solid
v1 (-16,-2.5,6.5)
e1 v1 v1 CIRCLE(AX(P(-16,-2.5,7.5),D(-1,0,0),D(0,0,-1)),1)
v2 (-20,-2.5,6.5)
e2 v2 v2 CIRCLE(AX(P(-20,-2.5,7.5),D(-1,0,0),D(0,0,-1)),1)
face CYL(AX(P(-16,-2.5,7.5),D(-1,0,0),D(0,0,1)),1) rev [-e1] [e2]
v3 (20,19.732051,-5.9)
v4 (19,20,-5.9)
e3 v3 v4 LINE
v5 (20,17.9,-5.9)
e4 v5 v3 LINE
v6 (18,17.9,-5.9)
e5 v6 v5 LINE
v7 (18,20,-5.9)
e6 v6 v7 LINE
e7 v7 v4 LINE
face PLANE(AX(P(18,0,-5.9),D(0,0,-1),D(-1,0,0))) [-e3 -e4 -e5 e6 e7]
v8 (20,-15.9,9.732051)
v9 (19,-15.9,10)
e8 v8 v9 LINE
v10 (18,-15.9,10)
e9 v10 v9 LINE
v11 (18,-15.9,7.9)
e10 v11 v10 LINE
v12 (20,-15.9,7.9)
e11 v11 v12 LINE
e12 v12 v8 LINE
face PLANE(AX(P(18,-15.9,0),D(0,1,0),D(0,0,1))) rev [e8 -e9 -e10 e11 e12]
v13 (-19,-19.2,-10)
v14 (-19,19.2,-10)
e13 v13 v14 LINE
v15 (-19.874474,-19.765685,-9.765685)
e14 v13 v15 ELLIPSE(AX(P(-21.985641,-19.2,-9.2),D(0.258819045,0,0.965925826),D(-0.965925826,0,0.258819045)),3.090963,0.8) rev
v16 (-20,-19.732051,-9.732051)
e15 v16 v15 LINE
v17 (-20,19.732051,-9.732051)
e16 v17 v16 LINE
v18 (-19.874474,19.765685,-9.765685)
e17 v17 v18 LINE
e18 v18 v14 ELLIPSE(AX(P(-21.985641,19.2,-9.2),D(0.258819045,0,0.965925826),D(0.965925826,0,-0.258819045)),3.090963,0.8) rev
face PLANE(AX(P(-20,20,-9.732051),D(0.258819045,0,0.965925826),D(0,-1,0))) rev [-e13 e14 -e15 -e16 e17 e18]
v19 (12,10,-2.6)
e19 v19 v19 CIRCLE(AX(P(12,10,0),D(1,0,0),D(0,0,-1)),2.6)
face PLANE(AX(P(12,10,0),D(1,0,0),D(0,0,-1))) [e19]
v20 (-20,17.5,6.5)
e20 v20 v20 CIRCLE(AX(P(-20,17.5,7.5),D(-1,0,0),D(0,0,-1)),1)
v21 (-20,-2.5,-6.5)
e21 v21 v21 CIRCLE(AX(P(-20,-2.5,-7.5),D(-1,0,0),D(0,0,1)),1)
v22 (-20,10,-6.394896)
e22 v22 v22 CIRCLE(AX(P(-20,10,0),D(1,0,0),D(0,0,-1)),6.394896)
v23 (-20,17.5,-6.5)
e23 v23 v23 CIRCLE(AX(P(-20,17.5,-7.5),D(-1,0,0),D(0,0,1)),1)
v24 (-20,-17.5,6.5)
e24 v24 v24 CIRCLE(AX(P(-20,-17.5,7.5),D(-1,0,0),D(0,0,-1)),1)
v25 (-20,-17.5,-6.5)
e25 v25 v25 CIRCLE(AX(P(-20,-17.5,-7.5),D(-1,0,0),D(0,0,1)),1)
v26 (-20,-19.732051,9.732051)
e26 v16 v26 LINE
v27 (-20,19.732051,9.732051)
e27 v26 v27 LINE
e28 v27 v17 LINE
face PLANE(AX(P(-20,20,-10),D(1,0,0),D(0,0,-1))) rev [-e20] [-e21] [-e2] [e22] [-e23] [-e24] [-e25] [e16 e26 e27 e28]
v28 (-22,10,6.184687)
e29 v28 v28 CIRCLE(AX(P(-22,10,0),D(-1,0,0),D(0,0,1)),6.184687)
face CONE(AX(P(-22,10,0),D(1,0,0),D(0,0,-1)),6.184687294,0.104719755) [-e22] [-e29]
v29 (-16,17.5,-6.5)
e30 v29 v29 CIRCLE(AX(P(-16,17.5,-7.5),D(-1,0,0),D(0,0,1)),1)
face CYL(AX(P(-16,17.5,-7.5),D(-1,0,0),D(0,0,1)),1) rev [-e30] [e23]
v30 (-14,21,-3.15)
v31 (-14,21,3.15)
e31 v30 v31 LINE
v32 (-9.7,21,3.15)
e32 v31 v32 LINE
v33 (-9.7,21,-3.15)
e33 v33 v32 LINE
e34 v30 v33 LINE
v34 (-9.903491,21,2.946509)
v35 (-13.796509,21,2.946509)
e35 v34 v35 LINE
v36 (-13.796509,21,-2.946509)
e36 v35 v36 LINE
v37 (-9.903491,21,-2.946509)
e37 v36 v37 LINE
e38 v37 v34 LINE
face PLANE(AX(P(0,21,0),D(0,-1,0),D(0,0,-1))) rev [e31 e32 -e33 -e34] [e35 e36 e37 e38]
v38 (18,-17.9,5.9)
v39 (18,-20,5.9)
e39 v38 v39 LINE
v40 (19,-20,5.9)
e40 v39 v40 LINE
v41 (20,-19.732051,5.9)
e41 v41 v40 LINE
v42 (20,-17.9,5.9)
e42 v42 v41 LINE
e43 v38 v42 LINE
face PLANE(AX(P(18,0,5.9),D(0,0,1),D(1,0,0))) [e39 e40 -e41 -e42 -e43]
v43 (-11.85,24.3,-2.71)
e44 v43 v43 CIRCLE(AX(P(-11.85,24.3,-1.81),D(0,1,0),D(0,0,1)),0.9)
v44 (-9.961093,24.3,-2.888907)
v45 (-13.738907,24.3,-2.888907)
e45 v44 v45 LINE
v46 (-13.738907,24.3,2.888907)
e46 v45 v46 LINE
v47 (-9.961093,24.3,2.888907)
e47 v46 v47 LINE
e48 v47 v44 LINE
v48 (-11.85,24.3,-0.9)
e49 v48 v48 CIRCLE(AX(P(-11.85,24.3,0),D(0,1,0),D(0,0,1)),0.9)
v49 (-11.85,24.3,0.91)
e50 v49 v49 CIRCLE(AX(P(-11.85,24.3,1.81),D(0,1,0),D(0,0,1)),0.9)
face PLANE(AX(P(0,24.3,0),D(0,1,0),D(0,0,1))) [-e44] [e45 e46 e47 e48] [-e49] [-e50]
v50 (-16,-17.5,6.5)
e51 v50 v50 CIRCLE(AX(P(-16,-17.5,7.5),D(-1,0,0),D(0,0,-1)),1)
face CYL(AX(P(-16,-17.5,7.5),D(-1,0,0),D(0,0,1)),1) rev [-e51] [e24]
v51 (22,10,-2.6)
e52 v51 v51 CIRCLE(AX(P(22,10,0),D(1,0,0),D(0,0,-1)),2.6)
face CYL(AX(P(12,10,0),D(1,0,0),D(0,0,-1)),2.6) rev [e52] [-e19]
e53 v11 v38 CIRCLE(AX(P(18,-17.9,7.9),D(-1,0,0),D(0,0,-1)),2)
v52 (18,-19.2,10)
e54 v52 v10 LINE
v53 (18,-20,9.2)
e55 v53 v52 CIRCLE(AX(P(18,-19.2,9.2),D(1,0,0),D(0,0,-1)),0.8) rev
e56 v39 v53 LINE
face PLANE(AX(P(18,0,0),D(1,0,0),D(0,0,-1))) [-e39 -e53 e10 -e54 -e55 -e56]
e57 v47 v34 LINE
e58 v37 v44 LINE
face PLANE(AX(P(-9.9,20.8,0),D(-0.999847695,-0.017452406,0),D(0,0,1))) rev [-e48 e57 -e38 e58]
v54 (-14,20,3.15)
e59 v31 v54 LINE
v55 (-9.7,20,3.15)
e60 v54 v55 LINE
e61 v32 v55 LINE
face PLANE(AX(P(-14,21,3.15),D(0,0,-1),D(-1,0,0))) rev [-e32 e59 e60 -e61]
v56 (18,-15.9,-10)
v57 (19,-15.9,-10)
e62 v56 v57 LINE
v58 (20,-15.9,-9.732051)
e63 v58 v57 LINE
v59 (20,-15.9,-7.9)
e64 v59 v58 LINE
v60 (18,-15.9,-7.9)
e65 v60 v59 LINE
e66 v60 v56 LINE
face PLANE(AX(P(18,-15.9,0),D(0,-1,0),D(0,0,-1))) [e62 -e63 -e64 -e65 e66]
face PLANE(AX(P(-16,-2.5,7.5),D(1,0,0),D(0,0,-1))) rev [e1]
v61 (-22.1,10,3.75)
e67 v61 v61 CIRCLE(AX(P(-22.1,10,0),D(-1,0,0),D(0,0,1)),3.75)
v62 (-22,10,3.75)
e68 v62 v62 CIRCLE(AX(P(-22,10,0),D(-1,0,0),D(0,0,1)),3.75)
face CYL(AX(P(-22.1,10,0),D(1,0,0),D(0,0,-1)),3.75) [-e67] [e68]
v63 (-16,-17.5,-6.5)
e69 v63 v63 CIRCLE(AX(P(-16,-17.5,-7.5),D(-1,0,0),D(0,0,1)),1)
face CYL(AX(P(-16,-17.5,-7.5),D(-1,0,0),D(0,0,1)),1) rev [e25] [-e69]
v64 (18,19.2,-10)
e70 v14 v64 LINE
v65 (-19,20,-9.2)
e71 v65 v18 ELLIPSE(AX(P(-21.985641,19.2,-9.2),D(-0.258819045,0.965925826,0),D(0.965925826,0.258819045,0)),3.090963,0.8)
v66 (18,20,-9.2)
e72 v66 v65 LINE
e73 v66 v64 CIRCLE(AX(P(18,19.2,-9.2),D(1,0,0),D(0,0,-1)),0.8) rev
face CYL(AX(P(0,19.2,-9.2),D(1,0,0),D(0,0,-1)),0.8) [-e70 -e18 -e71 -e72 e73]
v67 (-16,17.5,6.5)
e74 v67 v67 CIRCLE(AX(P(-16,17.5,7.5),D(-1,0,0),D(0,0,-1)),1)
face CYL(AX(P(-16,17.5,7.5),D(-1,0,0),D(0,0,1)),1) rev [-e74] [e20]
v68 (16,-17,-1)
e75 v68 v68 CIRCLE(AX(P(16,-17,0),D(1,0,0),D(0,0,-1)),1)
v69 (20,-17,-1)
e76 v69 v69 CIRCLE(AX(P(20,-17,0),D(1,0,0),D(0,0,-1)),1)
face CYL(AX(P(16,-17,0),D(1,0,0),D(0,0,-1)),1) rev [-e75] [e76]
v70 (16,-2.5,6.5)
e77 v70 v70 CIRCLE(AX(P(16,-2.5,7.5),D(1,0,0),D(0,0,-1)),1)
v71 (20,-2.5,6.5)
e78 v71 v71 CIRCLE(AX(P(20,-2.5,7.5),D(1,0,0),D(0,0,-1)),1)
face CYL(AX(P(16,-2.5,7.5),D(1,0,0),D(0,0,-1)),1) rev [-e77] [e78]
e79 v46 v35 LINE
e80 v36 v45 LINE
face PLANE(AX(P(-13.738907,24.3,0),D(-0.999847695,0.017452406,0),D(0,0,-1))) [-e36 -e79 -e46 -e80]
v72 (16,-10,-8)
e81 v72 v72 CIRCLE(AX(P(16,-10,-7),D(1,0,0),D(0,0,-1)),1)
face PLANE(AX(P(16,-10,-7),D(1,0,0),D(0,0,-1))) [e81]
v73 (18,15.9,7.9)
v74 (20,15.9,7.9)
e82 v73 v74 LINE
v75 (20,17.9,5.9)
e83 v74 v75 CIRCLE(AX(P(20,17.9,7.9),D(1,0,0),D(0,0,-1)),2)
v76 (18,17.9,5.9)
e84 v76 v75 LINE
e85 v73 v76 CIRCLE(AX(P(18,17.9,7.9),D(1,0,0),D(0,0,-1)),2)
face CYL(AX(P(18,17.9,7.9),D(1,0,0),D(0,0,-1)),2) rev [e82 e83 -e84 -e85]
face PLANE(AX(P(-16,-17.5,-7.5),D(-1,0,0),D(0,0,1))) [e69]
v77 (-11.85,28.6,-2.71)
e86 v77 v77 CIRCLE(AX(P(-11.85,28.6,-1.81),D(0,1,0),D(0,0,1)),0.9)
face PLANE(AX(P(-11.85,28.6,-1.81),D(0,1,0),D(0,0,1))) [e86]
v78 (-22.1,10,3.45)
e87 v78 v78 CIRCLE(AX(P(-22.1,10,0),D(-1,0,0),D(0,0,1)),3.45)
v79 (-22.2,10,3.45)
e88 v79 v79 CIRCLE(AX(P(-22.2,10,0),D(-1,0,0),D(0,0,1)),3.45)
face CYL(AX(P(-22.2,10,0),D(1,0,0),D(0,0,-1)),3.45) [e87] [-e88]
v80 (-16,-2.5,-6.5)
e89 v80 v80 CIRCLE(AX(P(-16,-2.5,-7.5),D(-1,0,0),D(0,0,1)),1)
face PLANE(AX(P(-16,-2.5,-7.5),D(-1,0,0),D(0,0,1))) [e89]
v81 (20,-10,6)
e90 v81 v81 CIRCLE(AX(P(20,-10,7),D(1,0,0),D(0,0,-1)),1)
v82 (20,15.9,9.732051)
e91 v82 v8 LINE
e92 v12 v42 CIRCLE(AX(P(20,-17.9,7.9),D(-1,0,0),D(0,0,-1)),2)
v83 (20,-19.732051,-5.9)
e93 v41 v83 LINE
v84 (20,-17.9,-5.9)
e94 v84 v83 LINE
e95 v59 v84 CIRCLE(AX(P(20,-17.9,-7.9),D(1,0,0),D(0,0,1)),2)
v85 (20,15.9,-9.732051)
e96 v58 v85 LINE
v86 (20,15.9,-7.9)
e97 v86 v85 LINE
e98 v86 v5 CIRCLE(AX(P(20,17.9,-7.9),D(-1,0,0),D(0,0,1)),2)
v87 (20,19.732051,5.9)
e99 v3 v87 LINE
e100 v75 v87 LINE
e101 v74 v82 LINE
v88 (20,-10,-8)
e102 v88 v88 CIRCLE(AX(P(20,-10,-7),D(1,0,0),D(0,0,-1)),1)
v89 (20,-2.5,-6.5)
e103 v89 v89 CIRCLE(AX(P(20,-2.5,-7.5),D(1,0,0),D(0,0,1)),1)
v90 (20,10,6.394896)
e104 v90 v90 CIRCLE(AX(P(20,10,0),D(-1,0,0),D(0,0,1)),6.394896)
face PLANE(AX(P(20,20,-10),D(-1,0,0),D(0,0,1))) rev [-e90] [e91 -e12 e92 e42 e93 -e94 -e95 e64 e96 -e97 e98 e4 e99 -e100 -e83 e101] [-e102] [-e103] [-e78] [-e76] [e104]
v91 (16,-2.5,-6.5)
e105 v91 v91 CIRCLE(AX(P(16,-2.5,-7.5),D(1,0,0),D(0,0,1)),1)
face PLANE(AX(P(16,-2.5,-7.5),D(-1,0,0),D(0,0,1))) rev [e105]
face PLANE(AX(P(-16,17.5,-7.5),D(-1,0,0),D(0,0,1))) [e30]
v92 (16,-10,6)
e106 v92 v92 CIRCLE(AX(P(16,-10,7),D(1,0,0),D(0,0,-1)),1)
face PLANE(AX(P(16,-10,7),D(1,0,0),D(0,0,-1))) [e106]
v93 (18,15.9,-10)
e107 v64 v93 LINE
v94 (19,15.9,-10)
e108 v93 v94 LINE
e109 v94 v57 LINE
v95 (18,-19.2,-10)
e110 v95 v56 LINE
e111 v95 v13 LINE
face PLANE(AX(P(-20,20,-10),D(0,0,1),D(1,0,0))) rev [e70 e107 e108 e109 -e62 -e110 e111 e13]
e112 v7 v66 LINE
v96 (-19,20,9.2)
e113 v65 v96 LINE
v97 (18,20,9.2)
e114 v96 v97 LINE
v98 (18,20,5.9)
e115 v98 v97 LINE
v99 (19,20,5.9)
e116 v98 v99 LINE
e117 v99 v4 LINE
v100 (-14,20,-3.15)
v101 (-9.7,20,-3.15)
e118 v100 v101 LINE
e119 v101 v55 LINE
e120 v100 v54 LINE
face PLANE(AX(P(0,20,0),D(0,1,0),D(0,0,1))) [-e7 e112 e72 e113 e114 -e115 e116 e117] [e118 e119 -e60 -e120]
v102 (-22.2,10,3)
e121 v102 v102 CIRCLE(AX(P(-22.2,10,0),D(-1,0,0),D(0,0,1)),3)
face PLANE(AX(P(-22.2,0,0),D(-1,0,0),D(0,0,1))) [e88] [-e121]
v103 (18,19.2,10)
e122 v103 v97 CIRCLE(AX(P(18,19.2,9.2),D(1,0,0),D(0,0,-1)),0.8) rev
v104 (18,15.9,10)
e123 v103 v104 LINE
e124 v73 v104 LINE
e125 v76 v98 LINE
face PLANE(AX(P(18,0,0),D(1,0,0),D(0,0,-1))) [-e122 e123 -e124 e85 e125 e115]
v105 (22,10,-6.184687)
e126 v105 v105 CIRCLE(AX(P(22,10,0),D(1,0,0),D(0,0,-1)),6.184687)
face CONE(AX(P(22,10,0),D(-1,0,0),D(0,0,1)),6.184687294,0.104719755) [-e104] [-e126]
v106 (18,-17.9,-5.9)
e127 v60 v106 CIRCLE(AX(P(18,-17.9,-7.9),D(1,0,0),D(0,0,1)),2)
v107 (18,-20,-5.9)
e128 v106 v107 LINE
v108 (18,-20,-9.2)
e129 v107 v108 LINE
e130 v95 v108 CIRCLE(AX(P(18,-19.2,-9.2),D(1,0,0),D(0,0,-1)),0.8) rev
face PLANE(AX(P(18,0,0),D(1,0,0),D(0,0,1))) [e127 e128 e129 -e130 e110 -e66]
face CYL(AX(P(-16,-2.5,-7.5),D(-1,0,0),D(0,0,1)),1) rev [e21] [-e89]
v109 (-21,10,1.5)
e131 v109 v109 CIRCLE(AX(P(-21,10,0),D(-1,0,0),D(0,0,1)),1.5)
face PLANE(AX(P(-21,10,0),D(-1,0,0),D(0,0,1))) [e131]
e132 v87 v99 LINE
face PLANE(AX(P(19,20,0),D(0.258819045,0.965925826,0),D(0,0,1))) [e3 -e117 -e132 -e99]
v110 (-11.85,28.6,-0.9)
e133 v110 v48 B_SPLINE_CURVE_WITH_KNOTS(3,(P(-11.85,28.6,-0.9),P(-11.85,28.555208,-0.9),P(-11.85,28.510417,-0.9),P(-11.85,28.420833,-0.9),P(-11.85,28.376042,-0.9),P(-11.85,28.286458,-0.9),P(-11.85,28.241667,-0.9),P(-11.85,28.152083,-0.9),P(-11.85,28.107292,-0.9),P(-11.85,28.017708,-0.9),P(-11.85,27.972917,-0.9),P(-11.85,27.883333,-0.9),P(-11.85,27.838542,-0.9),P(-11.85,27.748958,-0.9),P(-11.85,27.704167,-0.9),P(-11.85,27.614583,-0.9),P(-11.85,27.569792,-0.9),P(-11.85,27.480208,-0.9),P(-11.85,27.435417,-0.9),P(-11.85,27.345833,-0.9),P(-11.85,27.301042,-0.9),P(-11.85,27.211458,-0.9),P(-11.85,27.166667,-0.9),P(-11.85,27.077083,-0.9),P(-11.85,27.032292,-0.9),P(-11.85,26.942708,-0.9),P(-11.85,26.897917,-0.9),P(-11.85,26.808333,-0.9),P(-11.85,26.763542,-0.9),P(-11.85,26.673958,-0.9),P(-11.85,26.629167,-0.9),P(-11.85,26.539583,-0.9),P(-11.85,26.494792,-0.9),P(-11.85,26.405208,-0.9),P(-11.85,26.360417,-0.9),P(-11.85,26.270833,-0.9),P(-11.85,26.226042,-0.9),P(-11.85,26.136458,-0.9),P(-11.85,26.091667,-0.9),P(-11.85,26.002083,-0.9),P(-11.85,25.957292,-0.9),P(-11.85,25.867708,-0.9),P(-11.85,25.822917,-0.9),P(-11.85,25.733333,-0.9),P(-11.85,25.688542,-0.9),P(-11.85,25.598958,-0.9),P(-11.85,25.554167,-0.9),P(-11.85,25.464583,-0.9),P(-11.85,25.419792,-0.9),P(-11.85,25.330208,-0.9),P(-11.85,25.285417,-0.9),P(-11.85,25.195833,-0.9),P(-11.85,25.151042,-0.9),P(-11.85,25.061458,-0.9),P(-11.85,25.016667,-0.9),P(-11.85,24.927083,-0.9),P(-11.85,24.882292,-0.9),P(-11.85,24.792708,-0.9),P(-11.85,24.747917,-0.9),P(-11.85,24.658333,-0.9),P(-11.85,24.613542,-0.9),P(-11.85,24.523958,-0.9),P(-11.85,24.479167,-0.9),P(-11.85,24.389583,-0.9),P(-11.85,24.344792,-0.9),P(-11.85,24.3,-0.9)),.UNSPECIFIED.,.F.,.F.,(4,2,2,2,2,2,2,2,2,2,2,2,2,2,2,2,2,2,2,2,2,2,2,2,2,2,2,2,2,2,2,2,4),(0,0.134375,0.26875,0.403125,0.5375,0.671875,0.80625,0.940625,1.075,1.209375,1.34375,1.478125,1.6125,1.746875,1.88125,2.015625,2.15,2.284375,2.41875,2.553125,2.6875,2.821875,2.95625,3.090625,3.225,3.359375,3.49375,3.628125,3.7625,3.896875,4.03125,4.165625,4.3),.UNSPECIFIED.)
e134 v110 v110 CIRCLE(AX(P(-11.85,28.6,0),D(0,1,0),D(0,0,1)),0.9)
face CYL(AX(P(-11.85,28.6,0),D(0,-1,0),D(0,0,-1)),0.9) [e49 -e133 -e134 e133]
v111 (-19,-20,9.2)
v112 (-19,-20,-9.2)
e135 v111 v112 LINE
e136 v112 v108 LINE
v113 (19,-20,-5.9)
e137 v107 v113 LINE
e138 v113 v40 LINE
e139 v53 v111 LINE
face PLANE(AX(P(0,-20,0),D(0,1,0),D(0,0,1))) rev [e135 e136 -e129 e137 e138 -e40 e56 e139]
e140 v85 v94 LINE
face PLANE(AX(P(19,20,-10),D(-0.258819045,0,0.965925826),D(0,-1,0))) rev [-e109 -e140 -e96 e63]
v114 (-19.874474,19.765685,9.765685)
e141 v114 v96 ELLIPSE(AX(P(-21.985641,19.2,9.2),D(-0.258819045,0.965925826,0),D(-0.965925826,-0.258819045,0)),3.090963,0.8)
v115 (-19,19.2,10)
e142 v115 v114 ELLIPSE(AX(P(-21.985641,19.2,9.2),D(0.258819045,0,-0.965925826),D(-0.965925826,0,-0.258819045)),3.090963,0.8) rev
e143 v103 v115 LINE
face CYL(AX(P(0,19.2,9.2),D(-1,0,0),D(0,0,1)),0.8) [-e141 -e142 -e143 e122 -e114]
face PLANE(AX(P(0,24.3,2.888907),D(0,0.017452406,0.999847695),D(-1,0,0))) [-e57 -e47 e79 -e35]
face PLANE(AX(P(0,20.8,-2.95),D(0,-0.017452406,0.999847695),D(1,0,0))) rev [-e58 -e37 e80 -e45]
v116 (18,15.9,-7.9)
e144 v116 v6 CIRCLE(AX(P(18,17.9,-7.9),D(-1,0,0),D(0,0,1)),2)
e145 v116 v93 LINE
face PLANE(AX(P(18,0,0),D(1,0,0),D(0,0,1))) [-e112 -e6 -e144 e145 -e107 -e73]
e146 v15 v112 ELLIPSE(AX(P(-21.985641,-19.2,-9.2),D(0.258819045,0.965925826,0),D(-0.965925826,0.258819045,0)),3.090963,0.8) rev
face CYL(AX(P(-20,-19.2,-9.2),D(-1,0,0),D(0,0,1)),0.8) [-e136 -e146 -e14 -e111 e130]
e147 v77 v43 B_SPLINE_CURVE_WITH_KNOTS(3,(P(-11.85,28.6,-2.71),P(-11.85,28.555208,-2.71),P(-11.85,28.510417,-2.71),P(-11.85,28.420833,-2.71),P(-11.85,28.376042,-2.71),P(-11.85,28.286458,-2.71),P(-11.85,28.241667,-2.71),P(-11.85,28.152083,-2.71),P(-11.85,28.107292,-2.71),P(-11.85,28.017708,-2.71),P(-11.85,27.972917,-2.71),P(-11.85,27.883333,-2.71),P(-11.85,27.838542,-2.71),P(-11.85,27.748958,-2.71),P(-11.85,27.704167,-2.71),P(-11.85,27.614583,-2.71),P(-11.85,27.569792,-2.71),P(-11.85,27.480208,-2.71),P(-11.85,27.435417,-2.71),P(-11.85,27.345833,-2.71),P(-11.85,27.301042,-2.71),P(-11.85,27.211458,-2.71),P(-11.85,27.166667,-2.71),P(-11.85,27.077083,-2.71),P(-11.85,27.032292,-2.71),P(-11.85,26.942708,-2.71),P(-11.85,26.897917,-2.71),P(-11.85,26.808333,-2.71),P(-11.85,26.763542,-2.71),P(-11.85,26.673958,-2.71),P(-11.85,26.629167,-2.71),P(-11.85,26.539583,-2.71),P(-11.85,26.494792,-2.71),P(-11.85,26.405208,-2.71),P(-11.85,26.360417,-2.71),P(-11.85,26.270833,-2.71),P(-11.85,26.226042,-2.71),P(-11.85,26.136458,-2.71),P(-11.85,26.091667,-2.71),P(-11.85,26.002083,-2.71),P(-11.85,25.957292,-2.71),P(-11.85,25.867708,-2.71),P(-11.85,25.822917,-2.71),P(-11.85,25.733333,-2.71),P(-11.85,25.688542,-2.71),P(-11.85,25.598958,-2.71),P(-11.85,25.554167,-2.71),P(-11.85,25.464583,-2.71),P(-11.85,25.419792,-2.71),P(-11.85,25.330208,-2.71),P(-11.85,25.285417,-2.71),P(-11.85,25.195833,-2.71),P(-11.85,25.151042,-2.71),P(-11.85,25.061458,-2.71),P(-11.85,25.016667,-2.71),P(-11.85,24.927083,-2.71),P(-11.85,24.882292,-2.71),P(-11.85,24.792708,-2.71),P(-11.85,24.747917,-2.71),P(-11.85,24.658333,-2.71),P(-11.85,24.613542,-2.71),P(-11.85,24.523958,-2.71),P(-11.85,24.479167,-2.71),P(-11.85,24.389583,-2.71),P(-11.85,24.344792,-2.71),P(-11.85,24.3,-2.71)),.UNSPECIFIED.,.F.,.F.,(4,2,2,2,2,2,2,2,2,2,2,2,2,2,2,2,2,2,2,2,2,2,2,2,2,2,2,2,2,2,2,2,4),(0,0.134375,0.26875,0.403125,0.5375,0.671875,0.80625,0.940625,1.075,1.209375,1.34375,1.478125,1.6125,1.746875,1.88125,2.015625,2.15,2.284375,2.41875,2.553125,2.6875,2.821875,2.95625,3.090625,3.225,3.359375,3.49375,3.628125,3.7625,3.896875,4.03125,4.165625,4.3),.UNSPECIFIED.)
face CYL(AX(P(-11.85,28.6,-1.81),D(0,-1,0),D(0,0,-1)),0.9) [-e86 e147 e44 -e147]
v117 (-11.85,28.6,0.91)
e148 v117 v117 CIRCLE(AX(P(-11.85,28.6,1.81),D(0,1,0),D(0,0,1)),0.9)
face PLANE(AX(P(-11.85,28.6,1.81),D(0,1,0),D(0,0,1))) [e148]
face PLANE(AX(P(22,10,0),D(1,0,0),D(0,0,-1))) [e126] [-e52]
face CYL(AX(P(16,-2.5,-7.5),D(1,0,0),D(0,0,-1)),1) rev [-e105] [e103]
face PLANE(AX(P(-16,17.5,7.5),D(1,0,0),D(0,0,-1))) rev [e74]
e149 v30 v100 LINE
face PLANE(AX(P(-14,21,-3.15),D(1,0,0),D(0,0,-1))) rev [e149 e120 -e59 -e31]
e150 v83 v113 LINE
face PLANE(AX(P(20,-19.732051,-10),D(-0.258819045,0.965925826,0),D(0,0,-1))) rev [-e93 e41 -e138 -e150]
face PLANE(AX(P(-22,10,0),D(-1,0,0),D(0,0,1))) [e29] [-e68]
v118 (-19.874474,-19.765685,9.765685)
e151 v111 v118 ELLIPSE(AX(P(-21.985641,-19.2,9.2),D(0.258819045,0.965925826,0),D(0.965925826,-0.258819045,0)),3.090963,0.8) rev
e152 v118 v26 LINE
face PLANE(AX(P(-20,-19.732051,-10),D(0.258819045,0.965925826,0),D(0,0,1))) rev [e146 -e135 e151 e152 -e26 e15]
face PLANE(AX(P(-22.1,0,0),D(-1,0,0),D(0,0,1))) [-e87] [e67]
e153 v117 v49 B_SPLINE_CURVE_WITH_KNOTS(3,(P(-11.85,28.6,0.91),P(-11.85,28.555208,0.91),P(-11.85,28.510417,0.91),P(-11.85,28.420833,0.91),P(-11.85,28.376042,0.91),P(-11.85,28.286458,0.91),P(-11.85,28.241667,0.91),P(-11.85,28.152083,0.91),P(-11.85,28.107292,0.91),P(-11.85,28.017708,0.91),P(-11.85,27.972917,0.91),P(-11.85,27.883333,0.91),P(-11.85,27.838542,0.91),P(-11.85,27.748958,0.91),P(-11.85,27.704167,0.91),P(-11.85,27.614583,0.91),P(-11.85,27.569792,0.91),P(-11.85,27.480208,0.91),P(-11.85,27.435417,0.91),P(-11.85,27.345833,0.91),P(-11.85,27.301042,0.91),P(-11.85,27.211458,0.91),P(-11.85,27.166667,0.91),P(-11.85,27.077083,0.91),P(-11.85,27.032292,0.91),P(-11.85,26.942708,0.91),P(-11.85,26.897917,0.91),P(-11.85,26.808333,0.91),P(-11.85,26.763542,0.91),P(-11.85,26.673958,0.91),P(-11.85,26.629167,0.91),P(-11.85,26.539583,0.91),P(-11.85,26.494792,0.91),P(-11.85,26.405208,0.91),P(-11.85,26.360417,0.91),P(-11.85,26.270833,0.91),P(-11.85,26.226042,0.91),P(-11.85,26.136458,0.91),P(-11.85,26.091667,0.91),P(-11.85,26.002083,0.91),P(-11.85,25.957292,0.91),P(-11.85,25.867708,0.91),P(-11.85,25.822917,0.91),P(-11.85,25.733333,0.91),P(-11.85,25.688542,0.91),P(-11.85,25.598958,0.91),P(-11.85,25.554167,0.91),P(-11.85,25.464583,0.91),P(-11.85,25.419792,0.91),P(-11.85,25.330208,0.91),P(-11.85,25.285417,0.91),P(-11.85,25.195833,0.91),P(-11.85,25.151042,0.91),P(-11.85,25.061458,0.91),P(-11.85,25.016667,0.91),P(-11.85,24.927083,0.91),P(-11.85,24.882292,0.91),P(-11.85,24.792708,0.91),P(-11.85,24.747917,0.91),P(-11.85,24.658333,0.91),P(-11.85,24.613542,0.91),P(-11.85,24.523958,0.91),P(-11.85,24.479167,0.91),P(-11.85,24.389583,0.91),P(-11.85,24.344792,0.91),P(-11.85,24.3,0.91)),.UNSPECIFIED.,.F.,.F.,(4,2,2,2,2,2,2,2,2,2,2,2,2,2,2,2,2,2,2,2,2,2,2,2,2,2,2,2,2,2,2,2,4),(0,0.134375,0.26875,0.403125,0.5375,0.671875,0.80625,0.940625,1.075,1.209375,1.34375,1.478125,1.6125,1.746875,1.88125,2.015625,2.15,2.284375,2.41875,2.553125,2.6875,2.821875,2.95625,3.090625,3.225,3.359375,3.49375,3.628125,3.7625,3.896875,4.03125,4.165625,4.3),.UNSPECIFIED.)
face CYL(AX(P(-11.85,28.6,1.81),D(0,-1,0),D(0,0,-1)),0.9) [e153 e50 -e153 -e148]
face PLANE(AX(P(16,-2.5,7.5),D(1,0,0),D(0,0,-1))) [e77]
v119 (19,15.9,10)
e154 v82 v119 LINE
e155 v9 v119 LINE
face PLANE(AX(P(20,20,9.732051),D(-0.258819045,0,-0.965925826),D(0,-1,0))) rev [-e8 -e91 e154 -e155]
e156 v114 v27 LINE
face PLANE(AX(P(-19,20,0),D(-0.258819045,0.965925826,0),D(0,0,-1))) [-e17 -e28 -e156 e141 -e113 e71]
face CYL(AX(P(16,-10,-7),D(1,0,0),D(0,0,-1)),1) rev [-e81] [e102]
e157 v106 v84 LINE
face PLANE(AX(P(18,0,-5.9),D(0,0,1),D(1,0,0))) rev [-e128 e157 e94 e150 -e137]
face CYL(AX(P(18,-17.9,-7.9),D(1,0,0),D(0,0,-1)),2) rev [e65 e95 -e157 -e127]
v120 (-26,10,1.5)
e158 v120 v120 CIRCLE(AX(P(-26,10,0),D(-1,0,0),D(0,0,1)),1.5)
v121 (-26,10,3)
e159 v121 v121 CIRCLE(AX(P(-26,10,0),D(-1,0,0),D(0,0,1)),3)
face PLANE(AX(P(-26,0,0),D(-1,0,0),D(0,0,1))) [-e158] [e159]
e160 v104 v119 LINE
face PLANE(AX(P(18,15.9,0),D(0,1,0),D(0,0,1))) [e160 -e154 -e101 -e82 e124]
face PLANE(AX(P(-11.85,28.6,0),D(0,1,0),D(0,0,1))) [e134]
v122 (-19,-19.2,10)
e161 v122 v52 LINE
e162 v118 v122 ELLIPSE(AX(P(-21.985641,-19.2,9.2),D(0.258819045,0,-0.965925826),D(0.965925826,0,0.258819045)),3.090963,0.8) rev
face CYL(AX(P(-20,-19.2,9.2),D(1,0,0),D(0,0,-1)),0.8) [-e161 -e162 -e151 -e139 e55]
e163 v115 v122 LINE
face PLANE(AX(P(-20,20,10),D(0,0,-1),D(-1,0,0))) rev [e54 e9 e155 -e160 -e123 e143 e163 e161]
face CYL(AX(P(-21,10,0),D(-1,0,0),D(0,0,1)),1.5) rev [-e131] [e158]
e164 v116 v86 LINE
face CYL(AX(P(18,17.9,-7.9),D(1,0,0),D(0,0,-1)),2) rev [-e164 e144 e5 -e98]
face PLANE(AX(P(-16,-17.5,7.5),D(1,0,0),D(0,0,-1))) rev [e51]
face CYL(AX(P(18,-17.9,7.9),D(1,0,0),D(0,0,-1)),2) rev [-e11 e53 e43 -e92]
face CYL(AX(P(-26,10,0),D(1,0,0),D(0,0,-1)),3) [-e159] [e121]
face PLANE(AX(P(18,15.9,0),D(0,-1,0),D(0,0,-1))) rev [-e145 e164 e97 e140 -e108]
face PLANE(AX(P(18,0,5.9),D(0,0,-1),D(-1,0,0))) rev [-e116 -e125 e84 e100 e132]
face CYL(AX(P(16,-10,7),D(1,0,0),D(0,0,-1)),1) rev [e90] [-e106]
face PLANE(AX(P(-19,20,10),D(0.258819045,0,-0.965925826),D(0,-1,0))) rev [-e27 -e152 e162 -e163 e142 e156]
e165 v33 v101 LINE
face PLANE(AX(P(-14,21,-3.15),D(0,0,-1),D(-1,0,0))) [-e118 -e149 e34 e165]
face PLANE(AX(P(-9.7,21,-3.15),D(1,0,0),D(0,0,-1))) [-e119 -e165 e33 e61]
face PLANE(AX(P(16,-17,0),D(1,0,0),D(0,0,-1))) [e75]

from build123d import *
from OCP.BRepFilletAPI import BRepFilletAPI_MakeChamfer

# Parameters (mm, degrees)
SKETCH_1_W            = 40
SKETCH_1_H            = 20
EXTRUDE_1_DEPTH       = 20
SKETCH_4_R            = 6.5
EXTRUDE_2_DEPTH       = 2
CHAMFER_1_SIZE        = 3
CHAMFER_1_SIZE_2      = 0.315312706
SKETCH_5_R            = 6.5
EXTRUDE_3_DEPTH       = 2
CHAMFER_3_SIZE        = 3
CHAMFER_3_SIZE_2      = 0.315312706
SKETCH_7_R            = 2.6
CUT_EXTRUDE_1_DEPTH   = 10
SKETCH_8_R            = 3
EXTRUDE_4_DEPTH       = 4
SKETCH_8_5_R          = 3.45
SKETCH_8_5_R_2        = 3
EXTRUDE_5_DEPTH       = 0.2
SKETCH_8_6_R          = 3.75
SKETCH_8_6_R_2        = 3.45
EXTRUDE_6_DEPTH       = 0.1
SKETCH_9_R            = 1.5
CUT_EXTRUDE_2_DEPTH   = 5
CHAMFER_4_SIZE        = 1
CHAMFER_4_SIZE2       = 0.267949192
CHAMFER_5_SIZE        = 1
CHAMFER_5_SIZE2       = 0.267949192
FILLET_2_R            = 0.8
SKETCH_10_W           = 4.3
SKETCH_10_H           = 6.3
EXTRUDE_7_DEPTH       = 1
SKETCH_10_3_W         = 3.9
SKETCH_10_3_H         = 5.9
EXTRUDE_8_DEPTH       = 4.3
CHAMFER_6_SIZE        = 3.5
CHAMFER_6_SIZE_2      = 0.061092727
SKETCH_11_R           = 0.9
EXTRUDE_10_DEPTH      = 4.3
SKETCH_12_R           = 1
CUT_EXTRUDE_3_DEPTH   = 4
CUT_EXTRUDE_START     = -4
SKETCH_13_R           = 1
CUT_EXTRUDE_4_DEPTH   = 4
CUT_EXTRUDE_5_DEPTH   = 2
MIRROR_3_COPY_1_DEPTH = 2
SKETCH_15_R           = 1
CUT_EXTRUDE_7_DEPTH   = 4


with BuildPart() as part:
    # 草图1 → 凸台-拉伸1 (new, symmetric)
    with BuildSketch(Plane(origin=(0, 0, 0), x_dir=(1, 0, 0), z_dir=(0, 1, 0))):
        Rectangle(SKETCH_1_W, SKETCH_1_H)
    extrude(amount=EXTRUDE_1_DEPTH, both=True)

    # 草图4 → 凸台-拉伸2 (add)
    with BuildSketch(Plane.ZY.offset(20)):
        with Locations(Location((0, 10, 0), (0, 0, 180))):
            Circle(SKETCH_4_R)
    extrude(amount=EXTRUDE_2_DEPTH)

    # 倒角1
    # the kernel refuses this chamfer: 3, 0.315312706 mm, written as the material it takes off along each edge
    with BuildSketch(Plane(origin=(-22, 10, 0), x_dir=(0, 0, -1), z_dir=(0, 1, 0))) as chamfer_1_piece_1_section:
        Polygon((6.5, -CHAMFER_1_SIZE), (6.5 - CHAMFER_1_SIZE_2, 0), (6.5, 0), align=None)
    chamfer_1_piece_1 = revolve(axis=Axis((-22, 10, 0), (-1, 0, 0)), mode=Mode.PRIVATE)
    chamfer_1_piece_1 = split(chamfer_1_piece_1, bisect_by=Plane(origin=(-20, 10, 6.31172405), z_dir=(-1, 0, 0)), keep=Keep.TOP, mode=Mode.PRIVATE)
    add(chamfer_1_piece_1, mode=Mode.SUBTRACT)

    # 草图5 → 凸台-拉伸3 (add)
    with BuildSketch(Plane(origin=(20, 0, 0), x_dir=(0, 0, -1), z_dir=(1, 0, 0))):
        with Locations(Location((0, 10, 0), (0, 0, 180))):
            Circle(SKETCH_5_R)
    extrude(amount=EXTRUDE_3_DEPTH)

    # 倒角3
    # the kernel refuses this chamfer: 3, 0.315312706 mm, written as the material it takes off along each edge
    with BuildSketch(Plane(origin=(22, 10, 0), x_dir=(0, 0, 1), z_dir=(0, 1, 0))) as chamfer_3_piece_1_section:
        Polygon((6.5, -CHAMFER_3_SIZE), (6.5 - CHAMFER_3_SIZE_2, 0), (6.5, 0), align=None)
    chamfer_3_piece_1 = revolve(axis=Axis((22, 10, 0), (1, 0, 0)), mode=Mode.PRIVATE)
    chamfer_3_piece_1 = split(chamfer_3_piece_1, bisect_by=Plane(origin=(20, 10, -6.31172405), z_dir=(1, 0, 0)), keep=Keep.TOP, mode=Mode.PRIVATE)
    add(chamfer_3_piece_1, mode=Mode.SUBTRACT)

    # 草图7 → 切除-拉伸1 (cut)
    with BuildSketch(Plane(origin=(22, 0, 0), x_dir=(0, 0, -1), z_dir=(1, 0, 0))):
        with Locations((0, 10)):
            Circle(SKETCH_7_R)
    extrude(amount=-CUT_EXTRUDE_1_DEPTH, mode=Mode.SUBTRACT)

    # 草图8 → 凸台-拉伸4 (add)
    with BuildSketch(Plane.ZY.offset(22)):
        with Locations((0, 10)):
            Circle(SKETCH_8_R)
    extrude(amount=EXTRUDE_4_DEPTH)

    # 草图8<5> → 凸台-拉伸5 (add)
    with BuildSketch(Plane.ZY.offset(22)):
        with Locations((0, 10)):
            Circle(SKETCH_8_5_R)
        with Locations((0, 10)):
            Circle(SKETCH_8_5_R_2, mode=Mode.SUBTRACT)
    extrude(amount=EXTRUDE_5_DEPTH)

    # 草图8<6> → 凸台-拉伸6 (add)
    with BuildSketch(Plane.ZY.offset(22)):
        with Locations((0, 10)):
            Circle(SKETCH_8_6_R)
        with Locations((0, 10)):
            Circle(SKETCH_8_6_R_2, mode=Mode.SUBTRACT)
    extrude(amount=EXTRUDE_6_DEPTH)

    # 草图9 → 切除-拉伸2 (cut)
    with BuildSketch(Plane.ZY.offset(26)):
        with Locations((0, 10)):
            Circle(SKETCH_9_R)
    extrude(amount=-CUT_EXTRUDE_2_DEPTH, mode=Mode.SUBTRACT)

    # 倒角4: one chamfer whose edges measure the first distance from different faces: ONE call of the kernel's chamfer builder (chamfer() names one face for all edges)
    chamfer_4_edges_1 = [part.edges().sort_by_distance(p)[0] for p in [
        (20, 20, 0),
    ]]
    chamfer_4_side_1 = [part.faces().sort_by_distance(p)[0] for p in [
        (0, 20, 0),
    ]]
    chamfer_4_edges_2 = [part.edges().sort_by_distance(p)[0] for p in [
        (20, -20, 0),
    ]]
    chamfer_4_side_2 = [part.faces().sort_by_distance(p)[0] for p in [
        (0, -20, 0),
    ]]
    chamfer_4_edges_3 = [part.edges().sort_by_distance(p)[0] for p in [
        (20, 0, 10),
    ]]
    chamfer_4_side_3 = [part.faces().sort_by_distance(p)[0] for p in [
        (0, 0, 10),
    ]]
    chamfer_4_edges_4 = [part.edges().sort_by_distance(p)[0] for p in [
        (20, 0, -10),
    ]]
    chamfer_4_side_4 = [part.faces().sort_by_distance(p)[0] for p in [
        (0, 0, -10),
    ]]
    chamfer_4 = BRepFilletAPI_MakeChamfer(part.part.solid().wrapped)
    for e in chamfer_4_edges_1:
        chamfer_4.Add(CHAMFER_4_SIZE, CHAMFER_4_SIZE2, e.wrapped, chamfer_4_side_1[0].wrapped)  # the first distance lies on this face
    for e in chamfer_4_edges_2:
        chamfer_4.Add(CHAMFER_4_SIZE, CHAMFER_4_SIZE2, e.wrapped, chamfer_4_side_2[0].wrapped)  # the first distance lies on this face
    for e in chamfer_4_edges_3:
        chamfer_4.Add(CHAMFER_4_SIZE, CHAMFER_4_SIZE2, e.wrapped, chamfer_4_side_3[0].wrapped)  # the first distance lies on this face
    for e in chamfer_4_edges_4:
        chamfer_4.Add(CHAMFER_4_SIZE, CHAMFER_4_SIZE2, e.wrapped, chamfer_4_side_4[0].wrapped)  # the first distance lies on this face
    add(Compound.cast(chamfer_4.Shape()), mode=Mode.REPLACE)

    # 倒角5: one chamfer whose edges measure the first distance from different faces: ONE call of the kernel's chamfer builder (chamfer() names one face for all edges)
    chamfer_5_edges_1 = [part.edges().sort_by_distance(p)[0] for p in [
        (-20, 20, 0),
    ]]
    chamfer_5_side_1 = [part.faces().sort_by_distance(p)[0] for p in [
        (-0.5, 20, 0),
    ]]
    chamfer_5_edges_2 = [part.edges().sort_by_distance(p)[0] for p in [
        (-20, -20, 0),
    ]]
    chamfer_5_side_2 = [part.faces().sort_by_distance(p)[0] for p in [
        (-0.5, -20, 0),
    ]]
    chamfer_5_edges_3 = [part.edges().sort_by_distance(p)[0] for p in [
        (-20, 0, 10),
    ]]
    chamfer_5_side_3 = [part.faces().sort_by_distance(p)[0] for p in [
        (-0.5, 0, 10),
    ]]
    chamfer_5_edges_4 = [part.edges().sort_by_distance(p)[0] for p in [
        (-20, 0, -10),
    ]]
    chamfer_5_side_4 = [part.faces().sort_by_distance(p)[0] for p in [
        (-0.5, 0, -10),
    ]]
    chamfer_5 = BRepFilletAPI_MakeChamfer(part.part.solid().wrapped)
    for e in chamfer_5_edges_1:
        chamfer_5.Add(CHAMFER_5_SIZE, CHAMFER_5_SIZE2, e.wrapped, chamfer_5_side_1[0].wrapped)  # the first distance lies on this face
    for e in chamfer_5_edges_2:
        chamfer_5.Add(CHAMFER_5_SIZE, CHAMFER_5_SIZE2, e.wrapped, chamfer_5_side_2[0].wrapped)  # the first distance lies on this face
    for e in chamfer_5_edges_3:
        chamfer_5.Add(CHAMFER_5_SIZE, CHAMFER_5_SIZE2, e.wrapped, chamfer_5_side_3[0].wrapped)  # the first distance lies on this face
    for e in chamfer_5_edges_4:
        chamfer_5.Add(CHAMFER_5_SIZE, CHAMFER_5_SIZE2, e.wrapped, chamfer_5_side_4[0].wrapped)  # the first distance lies on this face
    add(Compound.cast(chamfer_5.Shape()), mode=Mode.REPLACE)

    # 圆角2
    fillet_2_edges = [part.edges().sort_by_distance(p)[0] for p in [
        (0, -20, -10),
        (0, 20, -10),
        (0, -20, 10),
        (0, 20, 10),
    ]]
    fillet(fillet_2_edges, radius=FILLET_2_R)

    # 草图10 → 凸台-拉伸7 (add)
    with BuildSketch(Plane(origin=(0, 20, 0), x_dir=(1, 0, 0), z_dir=(0, 1, 0))):
        with Locations((-11.85, 0)):
            Rectangle(SKETCH_10_W, SKETCH_10_H)
    extrude(amount=EXTRUDE_7_DEPTH)

    # 草图10<3> → 凸台-拉伸8 (add)
    with BuildSketch(Plane(origin=(0, 20, 0), x_dir=(1, 0, 0), z_dir=(0, 1, 0))):
        with Locations((-11.85, 0)):
            Rectangle(SKETCH_10_3_W, SKETCH_10_3_H)
    extrude(amount=EXTRUDE_8_DEPTH)

    # 倒角6
    # the kernel refuses this chamfer: 3.5, 0.061092727 mm, written as the material it takes off along each edge
    with BuildSketch(Plane(origin=(-9.9, 24.3, -12.049948743), x_dir=(0.0006712501823119154, -0.999999774711571, 0), z_dir=(0, 0, 1))) as chamfer_6_piece_1_section:
        Polygon((CHAMFER_6_SIZE * 0.999999774712, -CHAMFER_6_SIZE * 0.000671250182312), (-CHAMFER_6_SIZE_2 * 0.000671250185045, -CHAMFER_6_SIZE_2 * 0.999999778783), (0, 0), align=None)
    chamfer_6_piece_1 = extrude(amount=24.099897487, mode=Mode.PRIVATE)
    chamfer_6_piece_1 = split(chamfer_6_piece_1, bisect_by=Plane(origin=(-9.882223513, 21, 0), z_dir=(0, 1, 0)), keep=Keep.TOP, mode=Mode.PRIVATE)
    add(chamfer_6_piece_1, mode=Mode.SUBTRACT)
    with BuildSketch(Plane(origin=(-22.899948743, 24.3, -2.95), x_dir=(0, -0.999999774711571, -0.0006712501823120375), z_dir=(1, 0, 0))) as chamfer_6_piece_2_section:
        Polygon((CHAMFER_6_SIZE * 0.999999774712, -CHAMFER_6_SIZE * 0.000671250182312), (-CHAMFER_6_SIZE_2 * 0.000671250185045, -CHAMFER_6_SIZE_2 * 0.999999778783), (0, 0), align=None)
    chamfer_6_piece_2 = extrude(amount=22.099897487, mode=Mode.PRIVATE)
    chamfer_6_piece_2 = split(chamfer_6_piece_2, bisect_by=Plane(origin=(-11.85, 21, -2.967776487), z_dir=(0, 1, 0)), keep=Keep.TOP, mode=Mode.PRIVATE)
    add(chamfer_6_piece_2, mode=Mode.SUBTRACT)
    with BuildSketch(Plane(origin=(-13.8, 24.3, 12.049948743), x_dir=(-0.0006712501823119154, -0.999999774711571, 0), z_dir=(0, 0, -1))) as chamfer_6_piece_3_section:
        Polygon((CHAMFER_6_SIZE * 0.999999774712, -CHAMFER_6_SIZE * 0.000671250182312), (-CHAMFER_6_SIZE_2 * 0.000671250185045, -CHAMFER_6_SIZE_2 * 0.999999778783), (0, 0), align=None)
    chamfer_6_piece_3 = extrude(amount=24.099897487, mode=Mode.PRIVATE)
    chamfer_6_piece_3 = split(chamfer_6_piece_3, bisect_by=Plane(origin=(-13.817776487, 21, 0), z_dir=(0, 1, 0)), keep=Keep.TOP, mode=Mode.PRIVATE)
    add(chamfer_6_piece_3, mode=Mode.SUBTRACT)
    with BuildSketch(Plane(origin=(-0.800051257, 24.3, 2.95), x_dir=(0, -0.999999774711571, 0.0006712501823120375), z_dir=(-1, 0, 0))) as chamfer_6_piece_4_section:
        Polygon((CHAMFER_6_SIZE * 0.999999774712, -CHAMFER_6_SIZE * 0.000671250182312), (-CHAMFER_6_SIZE_2 * 0.000671250185045, -CHAMFER_6_SIZE_2 * 0.999999778783), (0, 0), align=None)
    chamfer_6_piece_4 = extrude(amount=22.099897487, mode=Mode.PRIVATE)
    chamfer_6_piece_4 = split(chamfer_6_piece_4, bisect_by=Plane(origin=(-11.85, 21, 2.967776487), z_dir=(0, 1, 0)), keep=Keep.TOP, mode=Mode.PRIVATE)
    add(chamfer_6_piece_4, mode=Mode.SUBTRACT)

    # 草图11 → 凸台-拉伸10 (add)
    with BuildSketch(Plane(origin=(0, 24.3, 0), x_dir=(1, 0, 0), z_dir=(0, 1, 0))):
        with Locations(Location((-11.85, 0, 0), (0, 0, 90))):
            Circle(SKETCH_11_R)
        with Locations(Location((-11.85, 1.81, 0), (0, 0, 90))):
            Circle(SKETCH_11_R)
        with Locations(Location((-11.85, -1.81, 0), (0, 0, 90))):
            Circle(SKETCH_11_R)
    extrude(amount=EXTRUDE_10_DEPTH)

    # 草图12 → 切除-拉伸3 (cut)
    with BuildSketch(Plane(origin=(20, 0, 0), x_dir=(0, 0, -1), z_dir=(1, 0, 0))):
        with Locations((-7.5, -2.5)):
            Circle(SKETCH_12_R)
        with Locations(Location((7.5, -2.5, 0), (0, 0, 180))):
            Circle(SKETCH_12_R)
    extrude(amount=-CUT_EXTRUDE_3_DEPTH, mode=Mode.SUBTRACT)

    # 草图13 → 切除-拉伸4 (cut)
    with BuildSketch(Plane.ZY.offset(20).offset(CUT_EXTRUDE_START)):
        with Locations((-7.5, -17.5)):
            Circle(SKETCH_13_R)
        with Locations(Location((7.5, -17.5, 0), (0, 0, 180))):
            Circle(SKETCH_13_R)
        with Locations((-7.5, -2.5)):
            Circle(SKETCH_13_R)
        with Locations((-7.5, 17.5)):
            Circle(SKETCH_13_R)
        with Locations(Location((7.5, 17.5, 0), (0, 0, 180))):
            Circle(SKETCH_13_R)
        with Locations(Location((7.5, -2.5, 0), (0, 0, 180))):
            Circle(SKETCH_13_R)
    extrude(amount=CUT_EXTRUDE_4_DEPTH, mode=Mode.SUBTRACT)

    # 草图14 → 切除-拉伸5 (cut)
    with BuildSketch(Plane(origin=(20, 0, 0), x_dir=(0, 0, -1), z_dir=(1, 0, 0))):
        with BuildLine():
            ThreePointArc((-9.732050808, 17.097759488), (-8.994421988, 16.2260106), (-7.9, 15.9))
            ThreePointArc((-7.9, 15.9), (-6.485786438, 16.485786438), (-5.9, 17.9))
            ThreePointArc((-5.9, 17.9), (-6.2260106, 18.994421988), (-7.097759488, 19.732050808))
            Line((-7.097759488, 19.732050808), (-8.702240512, 19.732050808))
            ThreePointArc((-8.702240512, 19.732050808), (-9.314213562, 19.314213562), (-9.732050808, 18.702240512))
            Line((-9.732050808, 18.702240512), (-9.732050808, 17.097759488))
        make_face()
        with BuildLine():
            Line((-9.732050808, 19.732050808), (-9.732050808, 18.702240512))
            ThreePointArc((-9.732050808, 18.702240512), (-9.314213562, 19.314213562), (-8.702240512, 19.732050808))
            Line((-8.702240512, 19.732050808), (-9.732050808, 19.732050808))
        make_face()
        with BuildLine():
            ThreePointArc((-7.097759488, 19.732050808), (-6.2260106, 18.994421988), (-5.9, 17.9))
            Line((-5.9, 17.9), (-5.9, 19.732050808))
            Line((-5.9, 19.732050808), (-7.097759488, 19.732050808))
        make_face()
        with BuildLine():
            Line((-8.702240512, 19.732050808), (-7.097759488, 19.732050808))
            ThreePointArc((-7.097759488, 19.732050808), (-7.9, 19.9), (-8.702240512, 19.732050808))
        make_face()
        with BuildLine():
            Line((-10, 15.9), (-9.732050808, 15.9))
            Line((-9.732050808, 15.9), (-9.732050808, 17.097759488))
            ThreePointArc((-9.732050808, 17.097759488), (-9.9, 17.9), (-9.732050808, 18.702240512))
            Line((-9.732050808, 18.702240512), (-9.732050808, 19.732050808))
            Line((-9.732050808, 19.732050808), (-8.702240512, 19.732050808))
            ThreePointArc((-8.702240512, 19.732050808), (-7.9, 19.9), (-7.097759488, 19.732050808))
            Line((-7.097759488, 19.732050808), (-5.9, 19.732050808))
            Line((-5.9, 19.732050808), (-5.9, 20))
            Line((-5.9, 20), (-10, 20))
            Line((-10, 20), (-10, 15.9))
        make_face()
        with BuildLine():
            ThreePointArc((-9.732050808, 18.702240512), (-9.9, 17.9), (-9.732050808, 17.097759488))
            Line((-9.732050808, 17.097759488), (-9.732050808, 18.702240512))
        make_face()
        with BuildLine():
            Line((-9.732050808, 15.9), (-7.9, 15.9))
            ThreePointArc((-7.9, 15.9), (-8.994421988, 16.2260106), (-9.732050808, 17.097759488))
            Line((-9.732050808, 17.097759488), (-9.732050808, 15.9))
        make_face()
    cut_extrude_5 = extrude(amount=-CUT_EXTRUDE_5_DEPTH, mode=Mode.SUBTRACT)

    # 镜向2: 切除-拉伸5 across plane
    add(cut_extrude_5.mirror(Plane.ZX), mode=Mode.SUBTRACT)

    # 镜向3: 切除-拉伸5 across plane
    add(cut_extrude_5.mirror(Plane.XY), mode=Mode.SUBTRACT)

    # 镜向3 copy 1 sketch → 镜向3 copy 1 (cut)
    with BuildSketch(Plane(origin=(20, 0, 0), x_dir=(0, 0, 1), z_dir=(1, 0, 0))):
        with BuildLine():
            ThreePointArc((-9.732050808, 17.097759488), (-8.994421988, 16.2260106), (-7.9, 15.9))
            ThreePointArc((-7.9, 15.9), (-6.485786438, 16.485786438), (-5.9, 17.9))
            ThreePointArc((-5.9, 17.9), (-6.2260106, 18.994421988), (-7.097759488, 19.732050808))
            Line((-7.097759488, 19.732050808), (-8.702240512, 19.732050808))
            ThreePointArc((-8.702240512, 19.732050808), (-9.314213562, 19.314213562), (-9.732050808, 18.702240512))
            Line((-9.732050808, 18.702240512), (-9.732050808, 17.097759488))
        make_face()
        with BuildLine():
            Line((-9.732050808, 19.732050808), (-9.732050808, 18.702240512))
            ThreePointArc((-9.732050808, 18.702240512), (-9.314213562, 19.314213562), (-8.702240512, 19.732050808))
            Line((-8.702240512, 19.732050808), (-9.732050808, 19.732050808))
        make_face()
        with BuildLine():
            ThreePointArc((-7.097759488, 19.732050808), (-6.2260106, 18.994421988), (-5.9, 17.9))
            Line((-5.9, 17.9), (-5.9, 19.732050808))
            Line((-5.9, 19.732050808), (-7.097759488, 19.732050808))
        make_face()
        with BuildLine():
            Line((-8.702240512, 19.732050808), (-7.097759488, 19.732050808))
            ThreePointArc((-7.097759488, 19.732050808), (-7.9, 19.9), (-8.702240512, 19.732050808))
        make_face()
        with BuildLine():
            Line((-10, 15.9), (-9.732050808, 15.9))
            Line((-9.732050808, 15.9), (-9.732050808, 17.097759488))
            ThreePointArc((-9.732050808, 17.097759488), (-9.9, 17.9), (-9.732050808, 18.702240512))
            Line((-9.732050808, 18.702240512), (-9.732050808, 19.732050808))
            Line((-9.732050808, 19.732050808), (-8.702240512, 19.732050808))
            ThreePointArc((-8.702240512, 19.732050808), (-7.9, 19.9), (-7.097759488, 19.732050808))
            Line((-7.097759488, 19.732050808), (-5.9, 19.732050808))
            Line((-5.9, 19.732050808), (-5.9, 20))
            Line((-5.9, 20), (-10, 20))
            Line((-10, 20), (-10, 15.9))
        make_face()
        with BuildLine():
            ThreePointArc((-9.732050808, 18.702240512), (-9.9, 17.9), (-9.732050808, 17.097759488))
            Line((-9.732050808, 17.097759488), (-9.732050808, 18.702240512))
        make_face()
        with BuildLine():
            Line((-9.732050808, 15.9), (-7.9, 15.9))
            ThreePointArc((-7.9, 15.9), (-8.994421988, 16.2260106), (-9.732050808, 17.097759488))
            Line((-9.732050808, 17.097759488), (-9.732050808, 15.9))
        make_face()
    extrude(amount=-MIRROR_3_COPY_1_DEPTH, mode=Mode.SUBTRACT)

    # 草图15 → 切除-拉伸7 (cut)
    with BuildSketch(Plane(origin=(20, 0, 0), x_dir=(0, 0, -1), z_dir=(1, 0, 0))):
        with Locations((0, -17)):
            Circle(SKETCH_15_R)
        with Locations((-7, -10)):
            Circle(SKETCH_15_R)
        with Locations((7, -10)):
            Circle(SKETCH_15_R)
    extrude(amount=-CUT_EXTRUDE_7_DEPTH, mode=Mode.SUBTRACT)


solid = part.part
